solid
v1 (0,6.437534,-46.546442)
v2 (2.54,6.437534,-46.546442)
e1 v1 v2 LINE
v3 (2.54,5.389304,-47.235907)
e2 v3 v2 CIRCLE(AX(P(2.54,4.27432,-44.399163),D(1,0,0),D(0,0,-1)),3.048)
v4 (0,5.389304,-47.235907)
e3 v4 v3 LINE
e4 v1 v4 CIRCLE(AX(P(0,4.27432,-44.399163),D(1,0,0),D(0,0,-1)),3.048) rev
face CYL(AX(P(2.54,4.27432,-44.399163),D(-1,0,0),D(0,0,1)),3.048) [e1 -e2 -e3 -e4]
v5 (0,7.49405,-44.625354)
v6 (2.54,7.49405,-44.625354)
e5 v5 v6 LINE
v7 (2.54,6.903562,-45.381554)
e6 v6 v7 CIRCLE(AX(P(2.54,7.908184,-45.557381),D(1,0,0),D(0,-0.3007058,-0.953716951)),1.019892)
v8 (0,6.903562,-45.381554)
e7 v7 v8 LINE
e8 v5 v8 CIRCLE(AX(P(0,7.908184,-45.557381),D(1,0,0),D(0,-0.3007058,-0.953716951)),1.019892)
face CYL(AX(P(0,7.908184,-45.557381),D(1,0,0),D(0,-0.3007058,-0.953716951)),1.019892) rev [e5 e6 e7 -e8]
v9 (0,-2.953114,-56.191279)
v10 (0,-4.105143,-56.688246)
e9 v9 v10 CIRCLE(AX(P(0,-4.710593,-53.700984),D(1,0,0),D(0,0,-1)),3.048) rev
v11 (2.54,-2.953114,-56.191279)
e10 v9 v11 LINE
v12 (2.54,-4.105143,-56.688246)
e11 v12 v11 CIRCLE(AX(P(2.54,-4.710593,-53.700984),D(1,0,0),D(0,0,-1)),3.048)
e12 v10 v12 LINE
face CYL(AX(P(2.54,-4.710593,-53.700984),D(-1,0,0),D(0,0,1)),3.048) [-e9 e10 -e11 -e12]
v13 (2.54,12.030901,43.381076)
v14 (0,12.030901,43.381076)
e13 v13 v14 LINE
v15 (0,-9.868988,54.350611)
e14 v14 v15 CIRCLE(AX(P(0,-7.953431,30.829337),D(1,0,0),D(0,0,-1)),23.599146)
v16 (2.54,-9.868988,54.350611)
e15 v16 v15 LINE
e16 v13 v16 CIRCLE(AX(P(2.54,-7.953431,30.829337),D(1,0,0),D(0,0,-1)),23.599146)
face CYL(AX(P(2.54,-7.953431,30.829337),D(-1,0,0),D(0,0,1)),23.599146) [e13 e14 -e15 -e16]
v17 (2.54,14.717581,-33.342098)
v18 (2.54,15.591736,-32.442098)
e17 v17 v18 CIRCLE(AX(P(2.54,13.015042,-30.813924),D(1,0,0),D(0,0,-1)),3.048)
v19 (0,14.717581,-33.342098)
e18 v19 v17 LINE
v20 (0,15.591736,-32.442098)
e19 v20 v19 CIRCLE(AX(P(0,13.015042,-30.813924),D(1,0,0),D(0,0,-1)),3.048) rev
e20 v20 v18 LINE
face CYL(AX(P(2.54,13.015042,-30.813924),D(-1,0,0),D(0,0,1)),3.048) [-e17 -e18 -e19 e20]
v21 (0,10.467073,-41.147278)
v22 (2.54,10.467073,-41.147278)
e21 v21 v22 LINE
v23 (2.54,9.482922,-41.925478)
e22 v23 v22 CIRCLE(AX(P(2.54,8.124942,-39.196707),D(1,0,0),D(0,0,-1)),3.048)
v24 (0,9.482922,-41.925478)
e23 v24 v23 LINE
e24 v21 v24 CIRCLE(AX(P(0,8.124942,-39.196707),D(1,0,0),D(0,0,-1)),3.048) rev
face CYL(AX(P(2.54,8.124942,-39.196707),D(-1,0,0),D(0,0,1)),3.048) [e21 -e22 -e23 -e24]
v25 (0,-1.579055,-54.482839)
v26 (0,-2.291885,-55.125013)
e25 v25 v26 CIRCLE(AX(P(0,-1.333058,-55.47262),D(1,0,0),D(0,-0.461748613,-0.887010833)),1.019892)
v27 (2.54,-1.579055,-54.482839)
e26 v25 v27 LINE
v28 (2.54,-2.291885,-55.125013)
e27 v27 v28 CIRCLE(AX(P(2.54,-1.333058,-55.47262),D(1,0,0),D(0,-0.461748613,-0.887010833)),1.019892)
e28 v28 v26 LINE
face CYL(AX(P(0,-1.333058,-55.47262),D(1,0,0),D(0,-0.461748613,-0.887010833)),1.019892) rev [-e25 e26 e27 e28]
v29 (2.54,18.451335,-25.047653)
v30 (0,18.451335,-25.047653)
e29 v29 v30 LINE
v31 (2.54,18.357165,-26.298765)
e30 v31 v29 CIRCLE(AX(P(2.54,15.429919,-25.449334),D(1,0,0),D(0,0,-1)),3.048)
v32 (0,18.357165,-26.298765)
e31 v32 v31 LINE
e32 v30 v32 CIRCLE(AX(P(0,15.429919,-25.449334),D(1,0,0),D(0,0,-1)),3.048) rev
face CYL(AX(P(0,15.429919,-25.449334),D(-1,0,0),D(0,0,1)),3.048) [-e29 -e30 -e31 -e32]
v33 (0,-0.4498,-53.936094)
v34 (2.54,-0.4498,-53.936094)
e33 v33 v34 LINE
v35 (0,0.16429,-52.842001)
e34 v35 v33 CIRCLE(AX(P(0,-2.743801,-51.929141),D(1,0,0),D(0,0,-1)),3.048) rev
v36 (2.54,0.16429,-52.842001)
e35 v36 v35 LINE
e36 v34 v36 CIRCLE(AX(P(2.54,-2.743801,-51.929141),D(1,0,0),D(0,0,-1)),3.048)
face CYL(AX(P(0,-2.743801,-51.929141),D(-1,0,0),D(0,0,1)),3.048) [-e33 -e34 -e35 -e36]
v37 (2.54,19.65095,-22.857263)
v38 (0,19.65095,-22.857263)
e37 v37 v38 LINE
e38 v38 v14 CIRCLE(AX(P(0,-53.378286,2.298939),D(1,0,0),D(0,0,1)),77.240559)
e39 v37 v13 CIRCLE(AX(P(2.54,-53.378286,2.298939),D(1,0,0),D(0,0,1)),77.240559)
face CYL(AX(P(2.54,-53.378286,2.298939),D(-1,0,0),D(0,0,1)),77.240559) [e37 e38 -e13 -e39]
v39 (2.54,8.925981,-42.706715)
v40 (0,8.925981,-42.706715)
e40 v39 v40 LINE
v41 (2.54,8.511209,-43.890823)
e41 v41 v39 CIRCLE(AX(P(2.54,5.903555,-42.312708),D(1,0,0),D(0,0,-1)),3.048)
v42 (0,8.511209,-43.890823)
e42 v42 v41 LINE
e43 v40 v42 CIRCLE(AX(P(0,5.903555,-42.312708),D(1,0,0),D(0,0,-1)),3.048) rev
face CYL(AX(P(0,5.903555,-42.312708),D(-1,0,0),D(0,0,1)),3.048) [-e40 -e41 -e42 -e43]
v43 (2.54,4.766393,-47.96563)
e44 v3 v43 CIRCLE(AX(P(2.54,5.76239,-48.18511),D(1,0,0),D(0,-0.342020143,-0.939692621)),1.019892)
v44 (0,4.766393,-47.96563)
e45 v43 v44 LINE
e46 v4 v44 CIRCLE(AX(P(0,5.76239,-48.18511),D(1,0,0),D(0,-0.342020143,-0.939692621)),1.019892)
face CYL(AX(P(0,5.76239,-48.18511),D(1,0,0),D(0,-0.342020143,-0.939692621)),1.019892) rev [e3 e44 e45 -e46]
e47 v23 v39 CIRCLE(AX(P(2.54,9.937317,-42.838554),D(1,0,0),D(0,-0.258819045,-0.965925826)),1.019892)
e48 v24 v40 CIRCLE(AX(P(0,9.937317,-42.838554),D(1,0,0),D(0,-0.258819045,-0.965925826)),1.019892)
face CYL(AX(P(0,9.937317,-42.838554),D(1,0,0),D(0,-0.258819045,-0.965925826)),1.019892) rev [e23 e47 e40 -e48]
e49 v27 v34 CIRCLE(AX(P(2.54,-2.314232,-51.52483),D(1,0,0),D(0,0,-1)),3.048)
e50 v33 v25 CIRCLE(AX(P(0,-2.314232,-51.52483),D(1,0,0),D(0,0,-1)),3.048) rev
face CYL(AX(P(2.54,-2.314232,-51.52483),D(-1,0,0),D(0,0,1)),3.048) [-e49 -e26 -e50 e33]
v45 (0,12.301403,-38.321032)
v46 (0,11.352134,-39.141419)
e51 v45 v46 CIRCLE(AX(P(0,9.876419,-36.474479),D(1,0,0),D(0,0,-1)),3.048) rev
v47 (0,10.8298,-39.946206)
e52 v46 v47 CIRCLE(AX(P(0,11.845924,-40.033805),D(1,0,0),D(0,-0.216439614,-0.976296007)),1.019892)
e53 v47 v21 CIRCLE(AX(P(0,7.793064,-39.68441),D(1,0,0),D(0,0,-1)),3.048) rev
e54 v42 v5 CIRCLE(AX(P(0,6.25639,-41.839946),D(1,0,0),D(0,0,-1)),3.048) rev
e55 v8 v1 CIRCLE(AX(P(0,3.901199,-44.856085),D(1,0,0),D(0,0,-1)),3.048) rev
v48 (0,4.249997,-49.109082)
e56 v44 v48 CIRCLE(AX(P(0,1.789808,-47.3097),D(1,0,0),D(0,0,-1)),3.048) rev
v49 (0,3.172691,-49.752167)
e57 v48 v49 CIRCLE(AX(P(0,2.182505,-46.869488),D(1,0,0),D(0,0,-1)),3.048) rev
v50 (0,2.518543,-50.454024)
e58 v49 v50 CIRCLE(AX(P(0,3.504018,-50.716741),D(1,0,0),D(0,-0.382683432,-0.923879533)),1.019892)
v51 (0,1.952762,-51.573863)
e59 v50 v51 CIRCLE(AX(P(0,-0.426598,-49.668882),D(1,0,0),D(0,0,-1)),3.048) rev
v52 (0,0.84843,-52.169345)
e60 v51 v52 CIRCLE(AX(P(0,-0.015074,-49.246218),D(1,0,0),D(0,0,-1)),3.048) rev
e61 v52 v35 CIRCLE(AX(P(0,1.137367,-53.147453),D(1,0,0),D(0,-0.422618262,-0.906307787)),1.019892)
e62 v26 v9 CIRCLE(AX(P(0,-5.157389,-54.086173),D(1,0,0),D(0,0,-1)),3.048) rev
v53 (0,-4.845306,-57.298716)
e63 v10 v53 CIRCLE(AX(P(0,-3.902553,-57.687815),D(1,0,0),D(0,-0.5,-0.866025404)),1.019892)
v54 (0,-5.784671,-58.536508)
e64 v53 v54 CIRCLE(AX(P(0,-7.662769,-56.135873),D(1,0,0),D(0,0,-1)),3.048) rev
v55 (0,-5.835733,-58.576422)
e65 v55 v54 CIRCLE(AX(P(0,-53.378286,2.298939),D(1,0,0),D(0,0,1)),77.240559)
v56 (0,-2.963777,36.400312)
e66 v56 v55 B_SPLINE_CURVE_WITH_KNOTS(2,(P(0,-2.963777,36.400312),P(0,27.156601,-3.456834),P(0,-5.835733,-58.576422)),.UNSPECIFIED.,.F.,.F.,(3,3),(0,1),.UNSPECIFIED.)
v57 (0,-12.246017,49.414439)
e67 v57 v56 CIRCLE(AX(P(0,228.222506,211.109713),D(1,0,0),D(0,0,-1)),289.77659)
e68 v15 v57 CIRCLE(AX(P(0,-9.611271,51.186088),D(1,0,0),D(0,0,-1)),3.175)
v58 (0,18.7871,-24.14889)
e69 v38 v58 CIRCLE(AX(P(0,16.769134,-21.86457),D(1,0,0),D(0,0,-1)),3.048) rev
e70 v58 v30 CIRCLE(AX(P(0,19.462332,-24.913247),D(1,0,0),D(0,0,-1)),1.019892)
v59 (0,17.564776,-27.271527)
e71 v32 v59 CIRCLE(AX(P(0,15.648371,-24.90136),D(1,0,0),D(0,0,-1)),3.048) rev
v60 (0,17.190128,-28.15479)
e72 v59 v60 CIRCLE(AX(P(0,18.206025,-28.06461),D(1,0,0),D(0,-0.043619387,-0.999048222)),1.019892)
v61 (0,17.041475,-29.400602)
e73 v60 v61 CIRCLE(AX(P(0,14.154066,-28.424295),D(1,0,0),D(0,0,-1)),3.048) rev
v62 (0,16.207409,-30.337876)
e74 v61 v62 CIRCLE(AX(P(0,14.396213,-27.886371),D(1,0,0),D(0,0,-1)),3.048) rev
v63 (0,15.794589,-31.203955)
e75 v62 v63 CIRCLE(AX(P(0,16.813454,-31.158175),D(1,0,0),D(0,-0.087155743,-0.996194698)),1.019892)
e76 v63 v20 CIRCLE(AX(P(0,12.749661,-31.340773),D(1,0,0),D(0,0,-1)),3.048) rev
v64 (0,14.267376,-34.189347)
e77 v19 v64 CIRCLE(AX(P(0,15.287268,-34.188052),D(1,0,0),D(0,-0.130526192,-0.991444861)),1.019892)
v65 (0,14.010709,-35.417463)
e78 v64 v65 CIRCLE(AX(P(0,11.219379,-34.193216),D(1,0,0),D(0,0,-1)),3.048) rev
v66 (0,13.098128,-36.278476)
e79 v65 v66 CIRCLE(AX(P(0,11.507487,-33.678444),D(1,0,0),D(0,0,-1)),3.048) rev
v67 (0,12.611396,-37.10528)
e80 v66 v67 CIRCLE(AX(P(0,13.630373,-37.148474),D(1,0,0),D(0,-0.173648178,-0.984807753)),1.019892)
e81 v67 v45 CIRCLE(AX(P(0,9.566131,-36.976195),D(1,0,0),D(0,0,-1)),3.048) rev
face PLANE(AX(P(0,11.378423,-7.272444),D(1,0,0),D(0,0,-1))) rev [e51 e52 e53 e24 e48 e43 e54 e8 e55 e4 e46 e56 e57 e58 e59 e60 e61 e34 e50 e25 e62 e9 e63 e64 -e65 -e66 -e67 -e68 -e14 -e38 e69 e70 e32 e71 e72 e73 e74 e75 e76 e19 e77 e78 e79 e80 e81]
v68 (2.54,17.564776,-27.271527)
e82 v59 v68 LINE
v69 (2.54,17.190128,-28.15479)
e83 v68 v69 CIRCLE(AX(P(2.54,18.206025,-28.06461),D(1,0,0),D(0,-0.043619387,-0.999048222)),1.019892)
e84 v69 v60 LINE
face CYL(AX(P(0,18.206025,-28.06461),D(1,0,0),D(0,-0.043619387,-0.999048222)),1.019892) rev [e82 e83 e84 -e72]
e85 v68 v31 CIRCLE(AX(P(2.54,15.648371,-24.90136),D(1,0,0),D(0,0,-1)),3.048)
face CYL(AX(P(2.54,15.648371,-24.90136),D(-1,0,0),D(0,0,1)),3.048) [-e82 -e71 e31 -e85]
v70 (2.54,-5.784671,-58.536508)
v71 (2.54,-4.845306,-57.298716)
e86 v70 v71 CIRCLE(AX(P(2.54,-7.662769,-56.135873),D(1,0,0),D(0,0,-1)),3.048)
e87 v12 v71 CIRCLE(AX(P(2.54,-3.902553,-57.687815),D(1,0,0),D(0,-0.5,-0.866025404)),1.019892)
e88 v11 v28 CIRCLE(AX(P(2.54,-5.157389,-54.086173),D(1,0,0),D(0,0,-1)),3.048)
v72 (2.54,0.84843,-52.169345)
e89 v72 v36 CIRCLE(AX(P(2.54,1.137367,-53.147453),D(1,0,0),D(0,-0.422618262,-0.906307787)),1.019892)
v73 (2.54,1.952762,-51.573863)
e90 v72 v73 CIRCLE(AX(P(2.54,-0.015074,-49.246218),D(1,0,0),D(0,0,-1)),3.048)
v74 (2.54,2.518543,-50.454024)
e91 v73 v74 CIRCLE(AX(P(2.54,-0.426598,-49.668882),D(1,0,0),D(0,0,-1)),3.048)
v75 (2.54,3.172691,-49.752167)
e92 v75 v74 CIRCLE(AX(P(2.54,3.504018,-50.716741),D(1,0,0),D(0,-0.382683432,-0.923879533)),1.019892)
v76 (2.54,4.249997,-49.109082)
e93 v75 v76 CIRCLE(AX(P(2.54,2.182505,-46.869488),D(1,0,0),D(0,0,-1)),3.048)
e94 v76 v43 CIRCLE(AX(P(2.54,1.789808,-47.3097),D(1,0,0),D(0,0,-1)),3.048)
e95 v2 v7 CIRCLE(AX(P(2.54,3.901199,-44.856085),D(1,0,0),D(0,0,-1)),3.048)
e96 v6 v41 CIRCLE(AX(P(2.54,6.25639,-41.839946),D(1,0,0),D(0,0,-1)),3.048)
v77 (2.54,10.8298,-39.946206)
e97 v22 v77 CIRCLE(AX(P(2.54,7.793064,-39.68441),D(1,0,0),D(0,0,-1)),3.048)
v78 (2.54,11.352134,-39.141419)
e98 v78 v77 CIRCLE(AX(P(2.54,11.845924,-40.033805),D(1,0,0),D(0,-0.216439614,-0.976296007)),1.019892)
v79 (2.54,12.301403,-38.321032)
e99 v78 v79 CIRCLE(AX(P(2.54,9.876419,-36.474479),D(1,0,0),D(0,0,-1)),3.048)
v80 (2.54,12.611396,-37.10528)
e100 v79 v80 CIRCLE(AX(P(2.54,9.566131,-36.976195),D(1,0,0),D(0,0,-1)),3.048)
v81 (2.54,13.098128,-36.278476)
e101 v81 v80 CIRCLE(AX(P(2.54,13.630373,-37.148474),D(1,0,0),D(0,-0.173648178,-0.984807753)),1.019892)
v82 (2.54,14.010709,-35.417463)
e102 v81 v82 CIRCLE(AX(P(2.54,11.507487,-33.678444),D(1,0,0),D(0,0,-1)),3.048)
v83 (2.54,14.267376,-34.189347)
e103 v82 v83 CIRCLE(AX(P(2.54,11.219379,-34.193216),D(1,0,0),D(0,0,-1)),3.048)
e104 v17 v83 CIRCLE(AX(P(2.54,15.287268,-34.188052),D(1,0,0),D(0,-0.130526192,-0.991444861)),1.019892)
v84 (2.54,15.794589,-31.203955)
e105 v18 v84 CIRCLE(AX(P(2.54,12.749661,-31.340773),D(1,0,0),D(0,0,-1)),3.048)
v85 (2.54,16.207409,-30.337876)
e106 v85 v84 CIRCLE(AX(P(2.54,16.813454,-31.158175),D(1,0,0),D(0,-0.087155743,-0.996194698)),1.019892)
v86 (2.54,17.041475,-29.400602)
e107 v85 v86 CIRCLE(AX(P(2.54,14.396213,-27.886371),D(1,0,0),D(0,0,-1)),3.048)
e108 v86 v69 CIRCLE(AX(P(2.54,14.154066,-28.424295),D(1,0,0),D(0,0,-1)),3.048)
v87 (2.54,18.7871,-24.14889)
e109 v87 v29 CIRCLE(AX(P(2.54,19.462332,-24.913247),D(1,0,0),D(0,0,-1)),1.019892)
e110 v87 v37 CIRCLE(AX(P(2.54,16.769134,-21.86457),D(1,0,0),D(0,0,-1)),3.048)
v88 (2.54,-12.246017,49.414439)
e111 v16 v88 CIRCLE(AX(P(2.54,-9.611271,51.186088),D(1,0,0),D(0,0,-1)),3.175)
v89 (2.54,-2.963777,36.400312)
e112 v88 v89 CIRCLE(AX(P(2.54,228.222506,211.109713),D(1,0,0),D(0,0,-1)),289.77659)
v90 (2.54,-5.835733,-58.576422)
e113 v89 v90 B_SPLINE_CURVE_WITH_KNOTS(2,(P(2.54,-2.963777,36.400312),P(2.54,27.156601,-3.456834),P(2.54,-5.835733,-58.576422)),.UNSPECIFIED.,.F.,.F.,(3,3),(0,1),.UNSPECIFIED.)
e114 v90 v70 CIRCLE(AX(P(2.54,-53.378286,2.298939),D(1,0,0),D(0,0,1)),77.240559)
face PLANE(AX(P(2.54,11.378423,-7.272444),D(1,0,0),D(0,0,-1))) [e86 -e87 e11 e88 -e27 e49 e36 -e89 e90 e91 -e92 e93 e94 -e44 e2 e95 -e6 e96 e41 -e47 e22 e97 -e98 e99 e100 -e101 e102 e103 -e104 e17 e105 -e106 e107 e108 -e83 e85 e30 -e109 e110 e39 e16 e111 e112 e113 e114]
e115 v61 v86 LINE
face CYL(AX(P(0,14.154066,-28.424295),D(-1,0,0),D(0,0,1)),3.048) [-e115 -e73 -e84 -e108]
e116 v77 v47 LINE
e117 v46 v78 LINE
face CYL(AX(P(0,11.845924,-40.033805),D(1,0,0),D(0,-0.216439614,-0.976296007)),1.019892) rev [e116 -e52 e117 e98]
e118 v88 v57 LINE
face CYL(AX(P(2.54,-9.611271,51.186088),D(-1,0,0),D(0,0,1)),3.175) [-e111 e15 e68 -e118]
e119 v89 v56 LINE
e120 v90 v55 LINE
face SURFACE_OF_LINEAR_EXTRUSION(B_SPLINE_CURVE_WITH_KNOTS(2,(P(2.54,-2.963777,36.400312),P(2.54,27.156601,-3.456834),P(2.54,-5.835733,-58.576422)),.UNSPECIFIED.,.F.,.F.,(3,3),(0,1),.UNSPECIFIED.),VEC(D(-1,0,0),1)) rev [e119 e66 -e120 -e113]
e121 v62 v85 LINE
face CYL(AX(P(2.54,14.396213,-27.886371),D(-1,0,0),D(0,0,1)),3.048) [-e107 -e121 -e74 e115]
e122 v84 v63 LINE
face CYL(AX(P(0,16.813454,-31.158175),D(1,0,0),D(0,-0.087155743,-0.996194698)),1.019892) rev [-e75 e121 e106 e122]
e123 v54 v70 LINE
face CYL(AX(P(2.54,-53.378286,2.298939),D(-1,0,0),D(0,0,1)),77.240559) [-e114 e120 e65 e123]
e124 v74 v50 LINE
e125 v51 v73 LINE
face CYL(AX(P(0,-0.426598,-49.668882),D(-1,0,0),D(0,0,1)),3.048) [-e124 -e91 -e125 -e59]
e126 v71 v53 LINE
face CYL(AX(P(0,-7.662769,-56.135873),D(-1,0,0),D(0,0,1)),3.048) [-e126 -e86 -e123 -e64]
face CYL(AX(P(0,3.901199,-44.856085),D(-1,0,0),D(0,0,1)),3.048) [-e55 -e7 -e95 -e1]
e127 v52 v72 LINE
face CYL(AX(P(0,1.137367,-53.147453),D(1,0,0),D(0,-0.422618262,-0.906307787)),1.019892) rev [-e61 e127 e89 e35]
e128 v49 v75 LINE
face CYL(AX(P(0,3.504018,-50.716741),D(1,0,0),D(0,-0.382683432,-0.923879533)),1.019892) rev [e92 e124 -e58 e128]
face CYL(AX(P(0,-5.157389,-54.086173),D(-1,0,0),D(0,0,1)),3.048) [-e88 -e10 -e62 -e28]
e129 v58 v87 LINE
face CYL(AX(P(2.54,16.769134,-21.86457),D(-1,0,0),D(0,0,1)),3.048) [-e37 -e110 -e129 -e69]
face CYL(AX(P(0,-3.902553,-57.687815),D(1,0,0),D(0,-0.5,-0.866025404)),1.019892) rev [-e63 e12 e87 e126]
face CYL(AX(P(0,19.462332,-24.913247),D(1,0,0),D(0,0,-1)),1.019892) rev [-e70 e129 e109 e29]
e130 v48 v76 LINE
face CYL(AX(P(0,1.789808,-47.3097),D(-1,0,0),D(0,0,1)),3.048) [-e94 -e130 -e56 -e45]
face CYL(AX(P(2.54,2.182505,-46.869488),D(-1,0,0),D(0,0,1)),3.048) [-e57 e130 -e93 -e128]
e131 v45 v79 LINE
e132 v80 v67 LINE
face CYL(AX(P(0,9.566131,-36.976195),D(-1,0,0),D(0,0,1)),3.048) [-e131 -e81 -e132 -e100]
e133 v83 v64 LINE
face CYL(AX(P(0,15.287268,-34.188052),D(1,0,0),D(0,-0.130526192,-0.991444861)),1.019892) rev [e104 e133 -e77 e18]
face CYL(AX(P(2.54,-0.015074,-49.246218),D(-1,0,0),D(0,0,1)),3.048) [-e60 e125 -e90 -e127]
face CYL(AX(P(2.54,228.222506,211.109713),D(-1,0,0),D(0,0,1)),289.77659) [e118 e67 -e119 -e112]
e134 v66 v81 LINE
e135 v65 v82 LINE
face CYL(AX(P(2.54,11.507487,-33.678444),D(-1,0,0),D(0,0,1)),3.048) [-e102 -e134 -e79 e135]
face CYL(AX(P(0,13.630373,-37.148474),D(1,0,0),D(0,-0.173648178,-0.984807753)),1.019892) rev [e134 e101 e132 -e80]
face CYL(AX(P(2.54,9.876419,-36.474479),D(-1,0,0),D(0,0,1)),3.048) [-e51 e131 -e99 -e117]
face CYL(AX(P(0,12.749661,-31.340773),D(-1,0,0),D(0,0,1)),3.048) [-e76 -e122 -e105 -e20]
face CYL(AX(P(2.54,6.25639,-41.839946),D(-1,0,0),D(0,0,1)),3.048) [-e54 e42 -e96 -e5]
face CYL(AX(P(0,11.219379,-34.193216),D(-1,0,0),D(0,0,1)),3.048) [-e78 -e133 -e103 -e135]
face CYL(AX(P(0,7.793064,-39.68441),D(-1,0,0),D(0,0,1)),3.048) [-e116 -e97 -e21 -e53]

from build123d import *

# Parameters (mm, degrees)
BOSS_EXTRUDE1_DEPTH = 2.54
CUT_EXTRUDE1_START  = -2.54
CUT_EXTRUDE1_DEPTH  = 2.54
CIRPATTERN1_COUNT   = 27
CIRPATTERN1_ANGLE   = 65
FILLET1_R           = 3.048


with BuildPart() as part:
    # Sketch1 → Boss-Extrude1 (new body)
    with BuildSketch(Plane(origin=(0, 0, 0), x_dir=(0, 0, -1), z_dir=(1, 0, 0))):
        with BuildLine():
            ThreePointArc((-43.381076299, 12.030901448), (11.033243319, 22.702964816), (58.576421759, -5.83573347))
            add(Edge.make_bspline(
                [(-36.400312003, -2.96377669), (3.456833979, 27.156600716), (58.576421759, -5.83573347)],
                knots=[0, 0, 0, 1, 1, 1], degree=2))
            ThreePointArc((-36.400312003, -2.96377669), (-42.843357456, -7.694652529), (-49.414438561, -12.246016505))
            ThreePointArc((-49.414438561, -12.246016505), (-52.563618606, -12.471871328), (-54.350611077, -9.868987685))
            ThreePointArc((-54.350611077, -9.868987685), (-51.929499525, 2.615525346), (-43.381076299, 12.030901448))
        make_face()
    extrude(amount=BOSS_EXTRUDE1_DEPTH)

    # Sketch2 → Cut-Extrude1 (cut)
    with BuildSketch(Plane(origin=(2.54, 0, 0), x_dir=(0, 0, -1), z_dir=(1, 0, 0)).offset(CUT_EXTRUDE1_START)):
        with BuildLine():
            ThreePointArc((25.551250128, 18.666636018), (25.832723904, 19.021035399), (25.93313959, 19.462332462))
            ThreePointArc((25.93313959, 19.462332462), (24.821637158, 20.47810228), (23.909811979, 19.279853215))
            ThreePointArc((23.909811989, 19.279853244), (24.732270015, 18.977899406), (25.55125014, 18.666636047))
        make_face()
        with BuildLine():
            ThreePointArc((25.55125014, 18.666636047), (24.732270015, 18.977899406), (23.909811989, 19.279853244))
            ThreePointArc((23.909811979, 19.279853215), (24.556324155, 18.506933739), (25.551250128, 18.666636018))
        make_face()
    cut_extrude1 = extrude(amount=CUT_EXTRUDE1_DEPTH, mode=Mode.SUBTRACT)

    # CirPattern1: Cut-Extrude1 ×27 about axis
    cirpattern1_axis = Axis((0, -53.378286458, 2.29893888), (-1, 0, 0))
    for i in range(1, CIRPATTERN1_COUNT):
        add(cut_extrude1.rotate(cirpattern1_axis, i * CIRPATTERN1_ANGLE / (CIRPATTERN1_COUNT - 1)), mode=Mode.SUBTRACT)

    # Fillet1
    # the kernel refuses this fillet: 3.048 mm, written as the material it takes off along each edge
    with BuildSketch(Plane(origin=(5.330131359, -4.91064789, -57.842493504), x_dir=(0, -0.7831380255895678, -0.6218479178027966), z_dir=(-1, 0, 0)), Plane(origin=(5.330131359, 18.666635995, -25.5512501), x_dir=(0, -0.3672934659287651, -0.9301051069024593), z_dir=(-1, 0, 0)), Plane(origin=(5.330131359, 17.383257012, -28.667298272), x_dir=(0, -0.40751449888321617, -0.913198736968006), z_dir=(-1, 0, 0)), Plane(origin=(5.330131359, 15.965179408, -31.724400451), x_dir=(0, -0.4469598048274426, -0.8945540413349069), z_dir=(-1, 0, 0)), Plane(origin=(5.330131359, 14.415102576, -34.71673727), x_dir=(0, -0.48555429737964134, -0.8742065112410012), z_dir=(-1, 0, 0)), Plane(origin=(5.330131359, 12.735977175, -37.638612645), x_dir=(0, -0.5232245097296833, -0.8521948793662941), z_dir=(-1, 0, 0)), Plane(origin=(5.330131359, 10.930999516, -40.484464621), x_dir=(0, -0.5598987344873042, -0.8285610461031312), z_dir=(-1, 0, 0)), Plane(origin=(5.330131359, 9.003605475, -43.248875957), x_dir=(0, -0.5955071601812754, -0.8033499997963732), z_dir=(-1, 0, 0)), Plane(origin=(5.330131359, 6.957463958, -45.926584439), x_dir=(0, -0.6299820041494215, -0.776609731105578), z_dir=(-1, 0, 0)), Plane(origin=(5.330131359, 4.79646991, -48.512492896), x_dir=(0, -0.663257641566846, -0.7483911416520008), z_dir=(-1, 0, 0)), Plane(origin=(5.330131359, 2.524736907, -51.001678904), x_dir=(0, -0.6952707303664444, -0.7187479471245193), z_dir=(-1, 0, 0)), Plane(origin=(5.330131359, 0.146589322, -53.389404158), x_dir=(0, -0.7259603318141797, -0.6877365750287285), z_dir=(-1, 0, 0)), Plane(origin=(5.330131359, -2.333445906, -55.671123485), x_dir=(0, -0.7552680265094119, -0.6554160572739871), z_dir=(-1, 0, 0))) as fillet1_piece_1:
        with BuildLine():
            CenterArc((1.094032194, 3.047920456), FILLET1_R, 240.878460026, 29.535478311)
            ThreePointArc((-0.389319175, 0.385220188), (-0.168317676, 0.2192323), (0, 0))
            ThreePointArc((0, 0), (0.558026272, -0.002015763), (1.116052544, 0))
        make_face()
    extrude(amount=8.120262718, mode=Mode.SUBTRACT)
    with BuildSketch(Plane(origin=(-2.790131315, 19.27985318, -23.909811985), x_dir=(0, -0.8996941201267986, -0.43652089321046916), z_dir=(1, 0, 0)), Plane(origin=(-2.790131315, 18.067489074, -27.0541706), x_dir=(0, -0.917878584614337, -0.39686131570912947), z_dir=(1, 0, 0)), Plane(origin=(-2.790131315, 16.719123874, -30.142653902), x_dir=(0, -0.9343158150472597, -0.35644629013720247), z_dir=(1, 0, 0)), Plane(origin=(-2.790131315, 15.23732427, -33.169382789), x_dir=(0, -0.9489745222231959, -0.3153527487929306), z_dir=(1, 0, 0)), Plane(origin=(-2.790131315, 13.62491095, -36.12859571), x_dir=(0, -0.9618268024599005, -0.27365891556783495), z_dir=(1, 0, 0)), Plane(origin=(-2.790131315, 11.884953236, -39.014659634), x_dir=(0, -0.9728481907114557, -0.23144415704322063), z_dir=(1, 0, 0)), Plane(origin=(-2.790131315, 10.020763236, -41.822080775), x_dir=(0, -0.982017707138919, -0.18878883141123673), z_dir=(1, 0, 0)), Plane(origin=(-2.790131315, 8.035889542, -44.545515048), x_dir=(0, -0.9893178970466047, -0.1457741355086141), z_dir=(1, 0, 0)), Plane(origin=(-2.790131315, 5.934110473, -47.179778241), x_dir=(0, -0.9947348641081103, -0.10248195025378501), z_dir=(1, 0, 0)), Plane(origin=(-2.790131315, 3.719426885, -49.719855883), x_dir=(0, -0.9982582968187538, -0.05899468478194456), z_dir=(1, 0, 0)), Plane(origin=(-2.790131315, -1.031583847, -54.498302279), x_dir=(0, -0.9996013481872734, 0.028233751117859005), z_dir=(1, 0, 0)), Plane(origin=(-2.790131315, -3.558867172, -56.72757499), x_dir=(0, -0.9974184102705359, 0.07180887726038374), z_dir=(1, 0, 0))) as fillet1_piece_2:
        with BuildLine():
            CenterArc((1.366088814, -2.936073381), FILLET1_R, 105.575244384, 29.535478311)
            ThreePointArc((-0.793333618, -0.784980924), (-0.398084606, -0.391057579), (0, 0))
            ThreePointArc((0, 0), (0.273844853, -0.037451811), (0.547689705, 0))
        make_face()
    extrude(amount=8.120262631, mode=Mode.SUBTRACT)
    with BuildSketch(Plane(origin=(-2.790131315, 1.396054555, -52.160912793), x_dir=(0, 0.6999264755180646, 0.7142149038411757), z_dir=(1, 0, 0))) as fillet1_piece_3:
        with BuildLine():
            CenterArc((1.094032194, 3.047920456), FILLET1_R, 240.878460026, 29.535478311)
            ThreePointArc((-0.389319175, 0.385220188), (-0.168317676, 0.2192323), (0, 0))
            ThreePointArc((0, 0), (0.558026272, -0.002015763), (1.116052544, 0))
        make_face()
    extrude(amount=8.120262631, mode=Mode.SUBTRACT)


solid = part.part
